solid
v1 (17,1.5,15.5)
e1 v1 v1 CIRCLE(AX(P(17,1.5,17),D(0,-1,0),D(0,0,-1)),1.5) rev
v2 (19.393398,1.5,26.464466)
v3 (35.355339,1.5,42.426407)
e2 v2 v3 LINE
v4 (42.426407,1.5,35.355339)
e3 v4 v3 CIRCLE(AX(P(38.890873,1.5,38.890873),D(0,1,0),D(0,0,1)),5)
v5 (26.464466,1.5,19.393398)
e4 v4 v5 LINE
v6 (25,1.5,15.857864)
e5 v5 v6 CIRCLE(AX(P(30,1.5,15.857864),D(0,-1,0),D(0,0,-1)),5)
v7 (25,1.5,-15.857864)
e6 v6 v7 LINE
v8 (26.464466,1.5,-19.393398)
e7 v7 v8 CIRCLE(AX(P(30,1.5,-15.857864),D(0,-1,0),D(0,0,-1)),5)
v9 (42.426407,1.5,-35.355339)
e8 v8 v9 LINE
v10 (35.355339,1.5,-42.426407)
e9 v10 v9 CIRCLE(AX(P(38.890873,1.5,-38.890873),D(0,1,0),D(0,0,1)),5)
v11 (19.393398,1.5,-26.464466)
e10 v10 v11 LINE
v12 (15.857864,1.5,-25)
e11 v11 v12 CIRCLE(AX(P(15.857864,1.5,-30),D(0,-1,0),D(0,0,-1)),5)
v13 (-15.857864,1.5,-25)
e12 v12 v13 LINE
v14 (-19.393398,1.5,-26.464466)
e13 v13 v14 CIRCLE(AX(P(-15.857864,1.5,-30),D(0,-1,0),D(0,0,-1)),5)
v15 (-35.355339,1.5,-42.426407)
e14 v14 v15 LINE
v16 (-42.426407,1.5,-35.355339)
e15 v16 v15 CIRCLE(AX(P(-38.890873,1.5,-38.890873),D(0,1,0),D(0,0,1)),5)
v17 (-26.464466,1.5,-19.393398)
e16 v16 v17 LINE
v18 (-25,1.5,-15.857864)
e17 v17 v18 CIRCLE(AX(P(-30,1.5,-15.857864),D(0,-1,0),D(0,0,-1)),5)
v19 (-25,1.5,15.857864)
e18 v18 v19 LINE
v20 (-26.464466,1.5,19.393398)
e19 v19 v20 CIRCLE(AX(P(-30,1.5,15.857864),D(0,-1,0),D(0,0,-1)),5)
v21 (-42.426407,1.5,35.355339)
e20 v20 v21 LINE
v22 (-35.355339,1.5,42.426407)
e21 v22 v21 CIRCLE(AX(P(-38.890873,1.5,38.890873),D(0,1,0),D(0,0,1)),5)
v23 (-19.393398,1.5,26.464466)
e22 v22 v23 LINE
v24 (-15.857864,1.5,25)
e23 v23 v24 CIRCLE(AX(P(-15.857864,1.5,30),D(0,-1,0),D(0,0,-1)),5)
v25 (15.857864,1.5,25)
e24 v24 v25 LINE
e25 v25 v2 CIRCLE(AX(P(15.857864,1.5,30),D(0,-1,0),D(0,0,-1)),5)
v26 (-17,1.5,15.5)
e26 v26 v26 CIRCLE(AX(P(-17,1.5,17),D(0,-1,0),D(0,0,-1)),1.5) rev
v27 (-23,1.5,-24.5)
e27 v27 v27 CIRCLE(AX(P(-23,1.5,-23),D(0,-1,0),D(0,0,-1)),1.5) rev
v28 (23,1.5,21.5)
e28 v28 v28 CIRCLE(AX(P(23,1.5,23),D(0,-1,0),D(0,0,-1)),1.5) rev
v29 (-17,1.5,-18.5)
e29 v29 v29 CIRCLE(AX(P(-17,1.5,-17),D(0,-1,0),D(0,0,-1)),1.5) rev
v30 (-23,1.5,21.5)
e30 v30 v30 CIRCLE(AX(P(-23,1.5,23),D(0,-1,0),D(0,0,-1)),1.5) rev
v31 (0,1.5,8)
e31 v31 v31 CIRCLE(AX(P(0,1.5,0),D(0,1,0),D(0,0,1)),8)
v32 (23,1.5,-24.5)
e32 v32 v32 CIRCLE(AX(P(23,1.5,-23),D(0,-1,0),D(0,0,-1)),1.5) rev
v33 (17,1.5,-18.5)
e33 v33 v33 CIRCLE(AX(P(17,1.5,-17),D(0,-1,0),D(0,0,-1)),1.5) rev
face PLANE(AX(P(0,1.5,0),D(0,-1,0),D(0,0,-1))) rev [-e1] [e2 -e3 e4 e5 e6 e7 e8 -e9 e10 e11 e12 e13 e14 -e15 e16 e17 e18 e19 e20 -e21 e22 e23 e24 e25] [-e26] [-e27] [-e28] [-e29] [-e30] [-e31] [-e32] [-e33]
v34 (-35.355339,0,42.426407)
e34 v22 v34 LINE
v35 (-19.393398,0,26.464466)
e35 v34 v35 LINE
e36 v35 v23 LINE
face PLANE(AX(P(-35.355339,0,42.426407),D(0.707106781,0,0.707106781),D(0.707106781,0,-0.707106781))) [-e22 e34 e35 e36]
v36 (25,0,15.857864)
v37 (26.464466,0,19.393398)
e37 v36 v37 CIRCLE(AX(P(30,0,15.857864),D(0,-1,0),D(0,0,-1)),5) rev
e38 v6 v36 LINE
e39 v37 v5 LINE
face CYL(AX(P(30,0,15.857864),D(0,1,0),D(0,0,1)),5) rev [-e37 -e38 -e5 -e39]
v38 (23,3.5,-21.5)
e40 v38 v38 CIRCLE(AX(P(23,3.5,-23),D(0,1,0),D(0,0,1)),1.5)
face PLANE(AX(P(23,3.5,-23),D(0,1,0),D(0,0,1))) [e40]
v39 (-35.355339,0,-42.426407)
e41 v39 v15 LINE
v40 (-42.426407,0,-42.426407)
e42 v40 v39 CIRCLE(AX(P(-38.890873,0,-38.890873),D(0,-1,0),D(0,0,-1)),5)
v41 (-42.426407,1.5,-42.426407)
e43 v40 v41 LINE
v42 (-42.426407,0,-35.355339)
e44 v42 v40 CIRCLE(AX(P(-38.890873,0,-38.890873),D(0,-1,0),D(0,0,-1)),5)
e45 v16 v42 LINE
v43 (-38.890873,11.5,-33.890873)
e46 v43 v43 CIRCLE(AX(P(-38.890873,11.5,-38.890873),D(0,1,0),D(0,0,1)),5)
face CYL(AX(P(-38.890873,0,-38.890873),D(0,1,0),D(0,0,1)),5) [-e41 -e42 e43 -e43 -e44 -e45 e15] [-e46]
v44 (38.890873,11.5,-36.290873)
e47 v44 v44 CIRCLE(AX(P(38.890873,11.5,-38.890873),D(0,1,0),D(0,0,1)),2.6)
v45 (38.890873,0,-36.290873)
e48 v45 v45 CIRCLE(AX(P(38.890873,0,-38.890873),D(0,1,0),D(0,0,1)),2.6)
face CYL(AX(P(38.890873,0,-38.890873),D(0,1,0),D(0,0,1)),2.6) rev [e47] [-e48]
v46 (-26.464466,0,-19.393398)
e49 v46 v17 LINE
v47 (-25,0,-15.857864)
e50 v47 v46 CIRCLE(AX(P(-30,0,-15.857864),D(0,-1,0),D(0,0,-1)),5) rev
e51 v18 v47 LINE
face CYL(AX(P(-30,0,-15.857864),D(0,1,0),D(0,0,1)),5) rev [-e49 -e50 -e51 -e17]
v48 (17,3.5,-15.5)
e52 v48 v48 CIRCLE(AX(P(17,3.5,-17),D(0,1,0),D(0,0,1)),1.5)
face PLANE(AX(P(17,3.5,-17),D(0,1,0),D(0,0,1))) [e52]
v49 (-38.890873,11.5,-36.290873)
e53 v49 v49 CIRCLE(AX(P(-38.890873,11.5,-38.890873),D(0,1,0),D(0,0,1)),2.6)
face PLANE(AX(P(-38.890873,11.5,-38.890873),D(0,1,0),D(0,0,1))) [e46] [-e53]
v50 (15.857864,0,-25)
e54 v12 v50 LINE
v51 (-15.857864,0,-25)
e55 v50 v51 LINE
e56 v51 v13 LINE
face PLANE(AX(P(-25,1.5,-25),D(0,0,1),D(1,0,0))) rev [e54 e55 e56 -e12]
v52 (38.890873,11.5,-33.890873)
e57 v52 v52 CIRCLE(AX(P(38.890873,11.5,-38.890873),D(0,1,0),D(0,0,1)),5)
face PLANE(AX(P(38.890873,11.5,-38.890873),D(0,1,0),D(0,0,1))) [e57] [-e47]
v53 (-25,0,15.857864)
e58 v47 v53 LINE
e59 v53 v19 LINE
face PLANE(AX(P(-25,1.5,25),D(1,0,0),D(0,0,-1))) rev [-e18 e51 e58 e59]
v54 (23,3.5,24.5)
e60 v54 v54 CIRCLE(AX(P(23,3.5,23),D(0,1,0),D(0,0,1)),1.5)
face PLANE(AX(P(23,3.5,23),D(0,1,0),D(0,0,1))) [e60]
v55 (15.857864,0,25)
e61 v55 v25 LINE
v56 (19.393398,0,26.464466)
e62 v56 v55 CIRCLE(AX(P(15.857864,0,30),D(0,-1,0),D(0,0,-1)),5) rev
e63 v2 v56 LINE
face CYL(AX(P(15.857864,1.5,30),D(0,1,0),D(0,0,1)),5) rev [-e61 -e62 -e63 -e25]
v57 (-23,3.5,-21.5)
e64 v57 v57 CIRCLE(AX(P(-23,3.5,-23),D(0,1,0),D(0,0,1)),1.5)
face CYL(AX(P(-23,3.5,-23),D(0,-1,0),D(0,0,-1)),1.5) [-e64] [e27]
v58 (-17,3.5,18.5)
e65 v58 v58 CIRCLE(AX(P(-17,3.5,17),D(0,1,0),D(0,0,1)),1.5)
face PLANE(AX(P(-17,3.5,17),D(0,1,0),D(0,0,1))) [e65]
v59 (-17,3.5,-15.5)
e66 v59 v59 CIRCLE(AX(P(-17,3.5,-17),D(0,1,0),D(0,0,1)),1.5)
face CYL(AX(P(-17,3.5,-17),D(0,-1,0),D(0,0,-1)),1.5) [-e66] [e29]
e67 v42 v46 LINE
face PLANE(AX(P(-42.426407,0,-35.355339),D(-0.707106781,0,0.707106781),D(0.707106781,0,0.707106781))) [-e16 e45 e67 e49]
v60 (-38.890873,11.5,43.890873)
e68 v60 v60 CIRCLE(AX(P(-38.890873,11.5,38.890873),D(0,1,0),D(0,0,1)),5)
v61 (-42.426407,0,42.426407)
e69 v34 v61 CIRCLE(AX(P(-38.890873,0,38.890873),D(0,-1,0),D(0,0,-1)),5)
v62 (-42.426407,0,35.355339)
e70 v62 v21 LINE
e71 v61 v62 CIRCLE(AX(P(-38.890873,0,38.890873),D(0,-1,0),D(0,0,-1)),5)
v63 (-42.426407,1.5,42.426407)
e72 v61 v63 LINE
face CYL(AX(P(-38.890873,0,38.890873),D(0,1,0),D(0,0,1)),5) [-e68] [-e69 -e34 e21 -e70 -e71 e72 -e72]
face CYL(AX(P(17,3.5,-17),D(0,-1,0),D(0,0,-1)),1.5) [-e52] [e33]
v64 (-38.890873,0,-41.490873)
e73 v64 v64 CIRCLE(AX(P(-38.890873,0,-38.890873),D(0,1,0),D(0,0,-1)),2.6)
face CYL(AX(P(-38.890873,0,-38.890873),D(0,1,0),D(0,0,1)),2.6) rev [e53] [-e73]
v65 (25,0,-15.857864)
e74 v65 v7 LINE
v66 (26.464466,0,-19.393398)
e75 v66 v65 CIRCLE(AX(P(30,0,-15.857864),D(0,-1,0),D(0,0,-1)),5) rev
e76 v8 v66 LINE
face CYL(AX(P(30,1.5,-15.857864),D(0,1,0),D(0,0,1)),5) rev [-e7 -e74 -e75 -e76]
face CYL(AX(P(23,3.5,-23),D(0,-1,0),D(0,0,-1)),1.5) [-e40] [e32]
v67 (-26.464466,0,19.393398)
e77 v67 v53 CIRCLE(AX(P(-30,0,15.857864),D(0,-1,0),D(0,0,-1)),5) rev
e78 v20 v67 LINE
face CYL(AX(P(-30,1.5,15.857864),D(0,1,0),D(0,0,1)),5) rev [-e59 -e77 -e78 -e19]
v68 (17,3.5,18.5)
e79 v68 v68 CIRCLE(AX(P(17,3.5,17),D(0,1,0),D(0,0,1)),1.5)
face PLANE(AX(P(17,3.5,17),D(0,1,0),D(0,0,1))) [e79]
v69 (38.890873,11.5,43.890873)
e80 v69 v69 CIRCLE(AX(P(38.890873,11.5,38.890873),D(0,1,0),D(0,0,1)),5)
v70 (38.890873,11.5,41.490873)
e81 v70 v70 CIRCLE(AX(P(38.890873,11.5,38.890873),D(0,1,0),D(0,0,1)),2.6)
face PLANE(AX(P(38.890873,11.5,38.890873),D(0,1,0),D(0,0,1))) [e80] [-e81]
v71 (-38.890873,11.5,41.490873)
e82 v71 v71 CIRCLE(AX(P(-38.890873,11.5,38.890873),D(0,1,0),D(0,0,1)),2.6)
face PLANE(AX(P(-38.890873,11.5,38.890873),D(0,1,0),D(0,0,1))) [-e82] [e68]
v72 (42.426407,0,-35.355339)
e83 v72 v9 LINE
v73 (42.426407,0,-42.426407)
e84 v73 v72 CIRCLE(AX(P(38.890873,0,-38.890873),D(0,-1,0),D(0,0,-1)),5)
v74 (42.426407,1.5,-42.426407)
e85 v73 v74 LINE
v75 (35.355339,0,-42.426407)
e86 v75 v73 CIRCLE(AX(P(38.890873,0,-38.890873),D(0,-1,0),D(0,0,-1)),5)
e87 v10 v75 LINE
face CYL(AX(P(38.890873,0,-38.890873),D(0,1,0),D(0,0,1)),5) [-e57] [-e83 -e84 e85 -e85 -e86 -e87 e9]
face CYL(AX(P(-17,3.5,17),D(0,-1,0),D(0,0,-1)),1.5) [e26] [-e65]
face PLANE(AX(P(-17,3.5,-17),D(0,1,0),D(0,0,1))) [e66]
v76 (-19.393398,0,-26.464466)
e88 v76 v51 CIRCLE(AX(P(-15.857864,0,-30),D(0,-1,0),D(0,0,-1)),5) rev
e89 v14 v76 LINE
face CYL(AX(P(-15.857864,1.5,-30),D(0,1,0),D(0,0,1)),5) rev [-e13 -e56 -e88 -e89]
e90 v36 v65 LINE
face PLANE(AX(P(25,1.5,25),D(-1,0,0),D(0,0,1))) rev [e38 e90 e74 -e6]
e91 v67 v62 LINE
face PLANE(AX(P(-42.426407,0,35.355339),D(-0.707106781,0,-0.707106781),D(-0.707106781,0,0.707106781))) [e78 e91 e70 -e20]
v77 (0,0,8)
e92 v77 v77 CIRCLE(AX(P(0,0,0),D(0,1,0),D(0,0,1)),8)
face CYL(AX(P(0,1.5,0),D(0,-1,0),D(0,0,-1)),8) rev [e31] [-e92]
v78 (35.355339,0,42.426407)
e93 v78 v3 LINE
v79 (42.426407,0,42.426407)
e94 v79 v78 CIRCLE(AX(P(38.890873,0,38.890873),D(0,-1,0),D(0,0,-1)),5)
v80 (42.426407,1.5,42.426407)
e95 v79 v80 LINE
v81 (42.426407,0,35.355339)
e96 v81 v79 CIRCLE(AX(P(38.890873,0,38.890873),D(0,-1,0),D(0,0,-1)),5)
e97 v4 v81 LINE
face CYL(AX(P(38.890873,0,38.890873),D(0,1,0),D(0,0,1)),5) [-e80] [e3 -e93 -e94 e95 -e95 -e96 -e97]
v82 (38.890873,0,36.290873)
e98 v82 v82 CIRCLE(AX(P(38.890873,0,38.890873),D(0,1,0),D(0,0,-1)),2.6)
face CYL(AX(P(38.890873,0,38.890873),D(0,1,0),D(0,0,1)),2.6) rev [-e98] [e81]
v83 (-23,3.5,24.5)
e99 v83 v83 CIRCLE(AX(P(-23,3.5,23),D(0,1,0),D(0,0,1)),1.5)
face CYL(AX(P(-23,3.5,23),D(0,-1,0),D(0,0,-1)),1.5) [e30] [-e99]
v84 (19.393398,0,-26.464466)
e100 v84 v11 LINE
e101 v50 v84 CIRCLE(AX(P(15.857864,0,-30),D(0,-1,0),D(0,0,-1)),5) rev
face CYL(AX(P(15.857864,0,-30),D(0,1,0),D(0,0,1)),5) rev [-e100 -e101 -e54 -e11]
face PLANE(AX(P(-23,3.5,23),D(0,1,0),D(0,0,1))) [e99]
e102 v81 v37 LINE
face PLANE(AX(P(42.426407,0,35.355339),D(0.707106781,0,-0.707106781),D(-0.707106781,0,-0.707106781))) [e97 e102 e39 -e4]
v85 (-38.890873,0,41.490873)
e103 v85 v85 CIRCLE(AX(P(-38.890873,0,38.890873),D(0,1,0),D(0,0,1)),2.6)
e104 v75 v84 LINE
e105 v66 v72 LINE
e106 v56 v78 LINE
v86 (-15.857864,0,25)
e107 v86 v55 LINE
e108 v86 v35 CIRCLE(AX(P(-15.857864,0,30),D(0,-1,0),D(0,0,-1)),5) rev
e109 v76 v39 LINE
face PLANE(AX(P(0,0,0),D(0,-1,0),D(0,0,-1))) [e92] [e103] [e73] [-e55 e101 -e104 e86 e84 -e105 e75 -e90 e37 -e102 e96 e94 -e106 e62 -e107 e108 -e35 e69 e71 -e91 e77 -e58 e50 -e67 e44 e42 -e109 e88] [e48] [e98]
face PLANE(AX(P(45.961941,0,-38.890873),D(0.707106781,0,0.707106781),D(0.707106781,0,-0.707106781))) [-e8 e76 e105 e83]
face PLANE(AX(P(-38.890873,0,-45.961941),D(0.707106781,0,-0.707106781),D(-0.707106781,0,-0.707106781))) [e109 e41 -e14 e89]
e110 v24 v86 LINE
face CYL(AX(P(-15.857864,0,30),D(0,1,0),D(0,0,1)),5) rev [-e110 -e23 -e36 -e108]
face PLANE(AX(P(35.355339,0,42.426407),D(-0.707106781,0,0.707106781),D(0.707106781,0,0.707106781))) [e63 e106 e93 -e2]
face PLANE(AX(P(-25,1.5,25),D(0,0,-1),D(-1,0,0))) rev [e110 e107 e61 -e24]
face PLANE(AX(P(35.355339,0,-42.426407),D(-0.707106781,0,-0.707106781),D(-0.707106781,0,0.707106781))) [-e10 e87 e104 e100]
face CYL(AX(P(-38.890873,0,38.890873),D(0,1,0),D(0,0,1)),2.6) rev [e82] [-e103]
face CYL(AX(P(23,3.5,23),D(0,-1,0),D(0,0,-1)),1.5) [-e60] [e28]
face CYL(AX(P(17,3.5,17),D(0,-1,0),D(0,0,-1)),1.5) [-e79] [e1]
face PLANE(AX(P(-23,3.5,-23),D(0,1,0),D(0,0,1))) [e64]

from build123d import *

# Parameters (mm, degrees)
SKETCH1_W           = 50
SKETCH1_H           = 50
SKETCH1_R           = 8
BOSS_EXTRUDE1_DEPTH = 1.5
SKETCH4_R           = 1.5
BOSS_EXTRUDE2_DEPTH = 2
BOSS_EXTRUDE3_START = -1.5
SKETCH5_R           = 2.6
SKETCH5_R_2         = 8
BOSS_EXTRUDE3_DEPTH = 1.5
FILLET1_R           = 5
SKETCH6_R           = 5
SKETCH6_R_2         = 2.6
BOSS_EXTRUDE4_DEPTH = 10


with BuildPart() as part:
    # Sketch1 → Boss-Extrude1 (new body)
    with BuildSketch(Plane(origin=(0, 0, 0), x_dir=(1, 0, 0), z_dir=(0, 1, 0))):
        Rectangle(SKETCH1_W, SKETCH1_H)
        with Locations(Location((0, 0, 0), (0, 0, 270))):
            Circle(SKETCH1_R, mode=Mode.SUBTRACT)
    extrude(amount=BOSS_EXTRUDE1_DEPTH)

    # Sketch4 → Boss-Extrude2 (add)
    with BuildSketch(Plane(origin=(0, 1.5, 0), x_dir=(1, 0, 0), z_dir=(0, 1, 0))):
        with Locations(Location((-23, 23, 0), (0, 0, 90))):
            Circle(SKETCH4_R)
        with Locations(Location((-17, 17, 0), (0, 0, 90))):
            Circle(SKETCH4_R)
        with Locations(Location((17, 17, 0), (0, 0, 90))):
            Circle(SKETCH4_R)
        with Locations(Location((23, 23, 0), (0, 0, 90))):
            Circle(SKETCH4_R)
        with Locations(Location((-17, -17, 0), (0, 0, 90))):
            Circle(SKETCH4_R)
        with Locations(Location((-23, -23, 0), (0, 0, 90))):
            Circle(SKETCH4_R)
        with Locations(Location((17, -17, 0), (0, 0, 90))):
            Circle(SKETCH4_R)
        with Locations(Location((23, -23, 0), (0, 0, 90))):
            Circle(SKETCH4_R)
    extrude(amount=BOSS_EXTRUDE2_DEPTH)

    # Sketch5 → Boss-Extrude3 (add)
    with BuildSketch(Plane(origin=(0, 1.5, 0), x_dir=(1, 0, 0), z_dir=(0, 1, 0)).offset(BOSS_EXTRUDE3_START)):
        Polygon((-42.426406871, -35.355339059), (-25, -17.928932188), (-25, 17.928932188), (-42.426406871, 35.355339059), (-45.961940777, 38.890872965), (-38.890872965, 45.961940777), (-35.355339059, 42.426406871), (-17.928932188, 25), (17.928932188, 25), (35.355339059, 42.426406871), (38.890872965, 45.961940777), (45.961940777, 38.890872965), (42.426406871, 35.355339059), (25, 17.928932188), (25, -17.928932188), (42.426406871, -35.355339059), (45.961940777, -38.890872965), (38.890872965, -45.961940777), (35.355339059, -42.426406871), (17.928932188, -25), (-17.928932188, -25), (-35.355339059, -42.426406871), (-38.890872965, -45.961940777), (-45.961940777, -38.890872965), align=None)
        with Locations(Location((-38.890872965, -38.890872965, 0), (0, 0, 270))):
            Circle(SKETCH5_R, mode=Mode.SUBTRACT)
        with Locations(Location((38.890872965, 38.890872965, 0), (0, 0, 270))):
            Circle(SKETCH5_R, mode=Mode.SUBTRACT)
        with Locations(Location((38.890872965, -38.890872965, 0), (0, 0, 90))):
            Circle(SKETCH5_R, mode=Mode.SUBTRACT)
        with Locations(Location((-38.890872965, 38.890872965, 0), (0, 0, 90))):
            Circle(SKETCH5_R, mode=Mode.SUBTRACT)
        with Locations(Location((0, 0, 0), (0, 0, 270))):
            Circle(SKETCH5_R_2, mode=Mode.SUBTRACT)
    extrude(amount=BOSS_EXTRUDE3_DEPTH)

    # Fillet1
    fillet1_edges = [part.edges().sort_by_distance(p)[0] for p in [
        (17.928932188, 0.75, 25),
        (38.890872965, 0.75, 45.961940777),
        (45.961940777, 0.75, 38.890872965),
        (25, 0.75, 17.928932188),
        (25, 0.75, -17.928932188),
        (45.961940777, 0.75, -38.890872965),
        (38.890872965, 0.75, -45.961940777),
        (17.928932188, 0.75, -25),
        (-17.928932188, 0.75, -25),
        (-38.890872965, 0.75, -45.961940777),
        (-45.961940777, 0.75, -38.890872965),
        (-25, 0.75, -17.928932188),
        (-25, 0.75, 17.928932188),
        (-45.961940777, 0.75, 38.890872965),
        (-38.890872965, 0.75, 45.961940777),
        (-17.928932188, 0.75, 25),
    ]]
    fillet(fillet1_edges, radius=FILLET1_R - 0.0001)  # a hair under: the kernel refuses the full size

    # Sketch6 → Boss-Extrude4 (add)
    # profile 1 of 4: a face of its own
    with BuildSketch(Plane(origin=(0, 1.5, 0), x_dir=(1, 0, 0), z_dir=(0, 1, 0))):
        with Locations(Location((-38.890872965, -38.890872965, 0), (0, 0, 270))):
            Circle(SKETCH6_R)
        with Locations(Location((-38.890872965, -38.890872965, 0), (0, 0, 270))):
            Circle(SKETCH6_R_2, mode=Mode.SUBTRACT)
    # profile 2 of 4: a face of its own
    with BuildSketch(Plane(origin=(0, 1.5, 0), x_dir=(1, 0, 0), z_dir=(0, 1, 0))):
        with Locations(Location((-38.890872965, 38.890872965, 0), (0, 0, 270))):
            Circle(SKETCH6_R)
        with Locations(Location((-38.890872965, 38.890872965, 0), (0, 0, 270))):
            Circle(SKETCH6_R_2, mode=Mode.SUBTRACT)
    # profile 3 of 4: a face of its own
    with BuildSketch(Plane(origin=(0, 1.5, 0), x_dir=(1, 0, 0), z_dir=(0, 1, 0))):
        with Locations(Location((38.890872965, 38.890872965, 0), (0, 0, 270))):
            Circle(SKETCH6_R)
        with Locations(Location((38.890872965, 38.890872965, 0), (0, 0, 270))):
            Circle(SKETCH6_R_2, mode=Mode.SUBTRACT)
    # profile 4 of 4: a face of its own
    with BuildSketch(Plane(origin=(0, 1.5, 0), x_dir=(1, 0, 0), z_dir=(0, 1, 0))):
        with Locations(Location((38.890872965, -38.890872965, 0), (0, 0, 270))):
            Circle(SKETCH6_R)
        with Locations(Location((38.890872965, -38.890872965, 0), (0, 0, 270))):
            Circle(SKETCH6_R_2, mode=Mode.SUBTRACT)
    extrude(amount=BOSS_EXTRUDE4_DEPTH)


solid = part.part
